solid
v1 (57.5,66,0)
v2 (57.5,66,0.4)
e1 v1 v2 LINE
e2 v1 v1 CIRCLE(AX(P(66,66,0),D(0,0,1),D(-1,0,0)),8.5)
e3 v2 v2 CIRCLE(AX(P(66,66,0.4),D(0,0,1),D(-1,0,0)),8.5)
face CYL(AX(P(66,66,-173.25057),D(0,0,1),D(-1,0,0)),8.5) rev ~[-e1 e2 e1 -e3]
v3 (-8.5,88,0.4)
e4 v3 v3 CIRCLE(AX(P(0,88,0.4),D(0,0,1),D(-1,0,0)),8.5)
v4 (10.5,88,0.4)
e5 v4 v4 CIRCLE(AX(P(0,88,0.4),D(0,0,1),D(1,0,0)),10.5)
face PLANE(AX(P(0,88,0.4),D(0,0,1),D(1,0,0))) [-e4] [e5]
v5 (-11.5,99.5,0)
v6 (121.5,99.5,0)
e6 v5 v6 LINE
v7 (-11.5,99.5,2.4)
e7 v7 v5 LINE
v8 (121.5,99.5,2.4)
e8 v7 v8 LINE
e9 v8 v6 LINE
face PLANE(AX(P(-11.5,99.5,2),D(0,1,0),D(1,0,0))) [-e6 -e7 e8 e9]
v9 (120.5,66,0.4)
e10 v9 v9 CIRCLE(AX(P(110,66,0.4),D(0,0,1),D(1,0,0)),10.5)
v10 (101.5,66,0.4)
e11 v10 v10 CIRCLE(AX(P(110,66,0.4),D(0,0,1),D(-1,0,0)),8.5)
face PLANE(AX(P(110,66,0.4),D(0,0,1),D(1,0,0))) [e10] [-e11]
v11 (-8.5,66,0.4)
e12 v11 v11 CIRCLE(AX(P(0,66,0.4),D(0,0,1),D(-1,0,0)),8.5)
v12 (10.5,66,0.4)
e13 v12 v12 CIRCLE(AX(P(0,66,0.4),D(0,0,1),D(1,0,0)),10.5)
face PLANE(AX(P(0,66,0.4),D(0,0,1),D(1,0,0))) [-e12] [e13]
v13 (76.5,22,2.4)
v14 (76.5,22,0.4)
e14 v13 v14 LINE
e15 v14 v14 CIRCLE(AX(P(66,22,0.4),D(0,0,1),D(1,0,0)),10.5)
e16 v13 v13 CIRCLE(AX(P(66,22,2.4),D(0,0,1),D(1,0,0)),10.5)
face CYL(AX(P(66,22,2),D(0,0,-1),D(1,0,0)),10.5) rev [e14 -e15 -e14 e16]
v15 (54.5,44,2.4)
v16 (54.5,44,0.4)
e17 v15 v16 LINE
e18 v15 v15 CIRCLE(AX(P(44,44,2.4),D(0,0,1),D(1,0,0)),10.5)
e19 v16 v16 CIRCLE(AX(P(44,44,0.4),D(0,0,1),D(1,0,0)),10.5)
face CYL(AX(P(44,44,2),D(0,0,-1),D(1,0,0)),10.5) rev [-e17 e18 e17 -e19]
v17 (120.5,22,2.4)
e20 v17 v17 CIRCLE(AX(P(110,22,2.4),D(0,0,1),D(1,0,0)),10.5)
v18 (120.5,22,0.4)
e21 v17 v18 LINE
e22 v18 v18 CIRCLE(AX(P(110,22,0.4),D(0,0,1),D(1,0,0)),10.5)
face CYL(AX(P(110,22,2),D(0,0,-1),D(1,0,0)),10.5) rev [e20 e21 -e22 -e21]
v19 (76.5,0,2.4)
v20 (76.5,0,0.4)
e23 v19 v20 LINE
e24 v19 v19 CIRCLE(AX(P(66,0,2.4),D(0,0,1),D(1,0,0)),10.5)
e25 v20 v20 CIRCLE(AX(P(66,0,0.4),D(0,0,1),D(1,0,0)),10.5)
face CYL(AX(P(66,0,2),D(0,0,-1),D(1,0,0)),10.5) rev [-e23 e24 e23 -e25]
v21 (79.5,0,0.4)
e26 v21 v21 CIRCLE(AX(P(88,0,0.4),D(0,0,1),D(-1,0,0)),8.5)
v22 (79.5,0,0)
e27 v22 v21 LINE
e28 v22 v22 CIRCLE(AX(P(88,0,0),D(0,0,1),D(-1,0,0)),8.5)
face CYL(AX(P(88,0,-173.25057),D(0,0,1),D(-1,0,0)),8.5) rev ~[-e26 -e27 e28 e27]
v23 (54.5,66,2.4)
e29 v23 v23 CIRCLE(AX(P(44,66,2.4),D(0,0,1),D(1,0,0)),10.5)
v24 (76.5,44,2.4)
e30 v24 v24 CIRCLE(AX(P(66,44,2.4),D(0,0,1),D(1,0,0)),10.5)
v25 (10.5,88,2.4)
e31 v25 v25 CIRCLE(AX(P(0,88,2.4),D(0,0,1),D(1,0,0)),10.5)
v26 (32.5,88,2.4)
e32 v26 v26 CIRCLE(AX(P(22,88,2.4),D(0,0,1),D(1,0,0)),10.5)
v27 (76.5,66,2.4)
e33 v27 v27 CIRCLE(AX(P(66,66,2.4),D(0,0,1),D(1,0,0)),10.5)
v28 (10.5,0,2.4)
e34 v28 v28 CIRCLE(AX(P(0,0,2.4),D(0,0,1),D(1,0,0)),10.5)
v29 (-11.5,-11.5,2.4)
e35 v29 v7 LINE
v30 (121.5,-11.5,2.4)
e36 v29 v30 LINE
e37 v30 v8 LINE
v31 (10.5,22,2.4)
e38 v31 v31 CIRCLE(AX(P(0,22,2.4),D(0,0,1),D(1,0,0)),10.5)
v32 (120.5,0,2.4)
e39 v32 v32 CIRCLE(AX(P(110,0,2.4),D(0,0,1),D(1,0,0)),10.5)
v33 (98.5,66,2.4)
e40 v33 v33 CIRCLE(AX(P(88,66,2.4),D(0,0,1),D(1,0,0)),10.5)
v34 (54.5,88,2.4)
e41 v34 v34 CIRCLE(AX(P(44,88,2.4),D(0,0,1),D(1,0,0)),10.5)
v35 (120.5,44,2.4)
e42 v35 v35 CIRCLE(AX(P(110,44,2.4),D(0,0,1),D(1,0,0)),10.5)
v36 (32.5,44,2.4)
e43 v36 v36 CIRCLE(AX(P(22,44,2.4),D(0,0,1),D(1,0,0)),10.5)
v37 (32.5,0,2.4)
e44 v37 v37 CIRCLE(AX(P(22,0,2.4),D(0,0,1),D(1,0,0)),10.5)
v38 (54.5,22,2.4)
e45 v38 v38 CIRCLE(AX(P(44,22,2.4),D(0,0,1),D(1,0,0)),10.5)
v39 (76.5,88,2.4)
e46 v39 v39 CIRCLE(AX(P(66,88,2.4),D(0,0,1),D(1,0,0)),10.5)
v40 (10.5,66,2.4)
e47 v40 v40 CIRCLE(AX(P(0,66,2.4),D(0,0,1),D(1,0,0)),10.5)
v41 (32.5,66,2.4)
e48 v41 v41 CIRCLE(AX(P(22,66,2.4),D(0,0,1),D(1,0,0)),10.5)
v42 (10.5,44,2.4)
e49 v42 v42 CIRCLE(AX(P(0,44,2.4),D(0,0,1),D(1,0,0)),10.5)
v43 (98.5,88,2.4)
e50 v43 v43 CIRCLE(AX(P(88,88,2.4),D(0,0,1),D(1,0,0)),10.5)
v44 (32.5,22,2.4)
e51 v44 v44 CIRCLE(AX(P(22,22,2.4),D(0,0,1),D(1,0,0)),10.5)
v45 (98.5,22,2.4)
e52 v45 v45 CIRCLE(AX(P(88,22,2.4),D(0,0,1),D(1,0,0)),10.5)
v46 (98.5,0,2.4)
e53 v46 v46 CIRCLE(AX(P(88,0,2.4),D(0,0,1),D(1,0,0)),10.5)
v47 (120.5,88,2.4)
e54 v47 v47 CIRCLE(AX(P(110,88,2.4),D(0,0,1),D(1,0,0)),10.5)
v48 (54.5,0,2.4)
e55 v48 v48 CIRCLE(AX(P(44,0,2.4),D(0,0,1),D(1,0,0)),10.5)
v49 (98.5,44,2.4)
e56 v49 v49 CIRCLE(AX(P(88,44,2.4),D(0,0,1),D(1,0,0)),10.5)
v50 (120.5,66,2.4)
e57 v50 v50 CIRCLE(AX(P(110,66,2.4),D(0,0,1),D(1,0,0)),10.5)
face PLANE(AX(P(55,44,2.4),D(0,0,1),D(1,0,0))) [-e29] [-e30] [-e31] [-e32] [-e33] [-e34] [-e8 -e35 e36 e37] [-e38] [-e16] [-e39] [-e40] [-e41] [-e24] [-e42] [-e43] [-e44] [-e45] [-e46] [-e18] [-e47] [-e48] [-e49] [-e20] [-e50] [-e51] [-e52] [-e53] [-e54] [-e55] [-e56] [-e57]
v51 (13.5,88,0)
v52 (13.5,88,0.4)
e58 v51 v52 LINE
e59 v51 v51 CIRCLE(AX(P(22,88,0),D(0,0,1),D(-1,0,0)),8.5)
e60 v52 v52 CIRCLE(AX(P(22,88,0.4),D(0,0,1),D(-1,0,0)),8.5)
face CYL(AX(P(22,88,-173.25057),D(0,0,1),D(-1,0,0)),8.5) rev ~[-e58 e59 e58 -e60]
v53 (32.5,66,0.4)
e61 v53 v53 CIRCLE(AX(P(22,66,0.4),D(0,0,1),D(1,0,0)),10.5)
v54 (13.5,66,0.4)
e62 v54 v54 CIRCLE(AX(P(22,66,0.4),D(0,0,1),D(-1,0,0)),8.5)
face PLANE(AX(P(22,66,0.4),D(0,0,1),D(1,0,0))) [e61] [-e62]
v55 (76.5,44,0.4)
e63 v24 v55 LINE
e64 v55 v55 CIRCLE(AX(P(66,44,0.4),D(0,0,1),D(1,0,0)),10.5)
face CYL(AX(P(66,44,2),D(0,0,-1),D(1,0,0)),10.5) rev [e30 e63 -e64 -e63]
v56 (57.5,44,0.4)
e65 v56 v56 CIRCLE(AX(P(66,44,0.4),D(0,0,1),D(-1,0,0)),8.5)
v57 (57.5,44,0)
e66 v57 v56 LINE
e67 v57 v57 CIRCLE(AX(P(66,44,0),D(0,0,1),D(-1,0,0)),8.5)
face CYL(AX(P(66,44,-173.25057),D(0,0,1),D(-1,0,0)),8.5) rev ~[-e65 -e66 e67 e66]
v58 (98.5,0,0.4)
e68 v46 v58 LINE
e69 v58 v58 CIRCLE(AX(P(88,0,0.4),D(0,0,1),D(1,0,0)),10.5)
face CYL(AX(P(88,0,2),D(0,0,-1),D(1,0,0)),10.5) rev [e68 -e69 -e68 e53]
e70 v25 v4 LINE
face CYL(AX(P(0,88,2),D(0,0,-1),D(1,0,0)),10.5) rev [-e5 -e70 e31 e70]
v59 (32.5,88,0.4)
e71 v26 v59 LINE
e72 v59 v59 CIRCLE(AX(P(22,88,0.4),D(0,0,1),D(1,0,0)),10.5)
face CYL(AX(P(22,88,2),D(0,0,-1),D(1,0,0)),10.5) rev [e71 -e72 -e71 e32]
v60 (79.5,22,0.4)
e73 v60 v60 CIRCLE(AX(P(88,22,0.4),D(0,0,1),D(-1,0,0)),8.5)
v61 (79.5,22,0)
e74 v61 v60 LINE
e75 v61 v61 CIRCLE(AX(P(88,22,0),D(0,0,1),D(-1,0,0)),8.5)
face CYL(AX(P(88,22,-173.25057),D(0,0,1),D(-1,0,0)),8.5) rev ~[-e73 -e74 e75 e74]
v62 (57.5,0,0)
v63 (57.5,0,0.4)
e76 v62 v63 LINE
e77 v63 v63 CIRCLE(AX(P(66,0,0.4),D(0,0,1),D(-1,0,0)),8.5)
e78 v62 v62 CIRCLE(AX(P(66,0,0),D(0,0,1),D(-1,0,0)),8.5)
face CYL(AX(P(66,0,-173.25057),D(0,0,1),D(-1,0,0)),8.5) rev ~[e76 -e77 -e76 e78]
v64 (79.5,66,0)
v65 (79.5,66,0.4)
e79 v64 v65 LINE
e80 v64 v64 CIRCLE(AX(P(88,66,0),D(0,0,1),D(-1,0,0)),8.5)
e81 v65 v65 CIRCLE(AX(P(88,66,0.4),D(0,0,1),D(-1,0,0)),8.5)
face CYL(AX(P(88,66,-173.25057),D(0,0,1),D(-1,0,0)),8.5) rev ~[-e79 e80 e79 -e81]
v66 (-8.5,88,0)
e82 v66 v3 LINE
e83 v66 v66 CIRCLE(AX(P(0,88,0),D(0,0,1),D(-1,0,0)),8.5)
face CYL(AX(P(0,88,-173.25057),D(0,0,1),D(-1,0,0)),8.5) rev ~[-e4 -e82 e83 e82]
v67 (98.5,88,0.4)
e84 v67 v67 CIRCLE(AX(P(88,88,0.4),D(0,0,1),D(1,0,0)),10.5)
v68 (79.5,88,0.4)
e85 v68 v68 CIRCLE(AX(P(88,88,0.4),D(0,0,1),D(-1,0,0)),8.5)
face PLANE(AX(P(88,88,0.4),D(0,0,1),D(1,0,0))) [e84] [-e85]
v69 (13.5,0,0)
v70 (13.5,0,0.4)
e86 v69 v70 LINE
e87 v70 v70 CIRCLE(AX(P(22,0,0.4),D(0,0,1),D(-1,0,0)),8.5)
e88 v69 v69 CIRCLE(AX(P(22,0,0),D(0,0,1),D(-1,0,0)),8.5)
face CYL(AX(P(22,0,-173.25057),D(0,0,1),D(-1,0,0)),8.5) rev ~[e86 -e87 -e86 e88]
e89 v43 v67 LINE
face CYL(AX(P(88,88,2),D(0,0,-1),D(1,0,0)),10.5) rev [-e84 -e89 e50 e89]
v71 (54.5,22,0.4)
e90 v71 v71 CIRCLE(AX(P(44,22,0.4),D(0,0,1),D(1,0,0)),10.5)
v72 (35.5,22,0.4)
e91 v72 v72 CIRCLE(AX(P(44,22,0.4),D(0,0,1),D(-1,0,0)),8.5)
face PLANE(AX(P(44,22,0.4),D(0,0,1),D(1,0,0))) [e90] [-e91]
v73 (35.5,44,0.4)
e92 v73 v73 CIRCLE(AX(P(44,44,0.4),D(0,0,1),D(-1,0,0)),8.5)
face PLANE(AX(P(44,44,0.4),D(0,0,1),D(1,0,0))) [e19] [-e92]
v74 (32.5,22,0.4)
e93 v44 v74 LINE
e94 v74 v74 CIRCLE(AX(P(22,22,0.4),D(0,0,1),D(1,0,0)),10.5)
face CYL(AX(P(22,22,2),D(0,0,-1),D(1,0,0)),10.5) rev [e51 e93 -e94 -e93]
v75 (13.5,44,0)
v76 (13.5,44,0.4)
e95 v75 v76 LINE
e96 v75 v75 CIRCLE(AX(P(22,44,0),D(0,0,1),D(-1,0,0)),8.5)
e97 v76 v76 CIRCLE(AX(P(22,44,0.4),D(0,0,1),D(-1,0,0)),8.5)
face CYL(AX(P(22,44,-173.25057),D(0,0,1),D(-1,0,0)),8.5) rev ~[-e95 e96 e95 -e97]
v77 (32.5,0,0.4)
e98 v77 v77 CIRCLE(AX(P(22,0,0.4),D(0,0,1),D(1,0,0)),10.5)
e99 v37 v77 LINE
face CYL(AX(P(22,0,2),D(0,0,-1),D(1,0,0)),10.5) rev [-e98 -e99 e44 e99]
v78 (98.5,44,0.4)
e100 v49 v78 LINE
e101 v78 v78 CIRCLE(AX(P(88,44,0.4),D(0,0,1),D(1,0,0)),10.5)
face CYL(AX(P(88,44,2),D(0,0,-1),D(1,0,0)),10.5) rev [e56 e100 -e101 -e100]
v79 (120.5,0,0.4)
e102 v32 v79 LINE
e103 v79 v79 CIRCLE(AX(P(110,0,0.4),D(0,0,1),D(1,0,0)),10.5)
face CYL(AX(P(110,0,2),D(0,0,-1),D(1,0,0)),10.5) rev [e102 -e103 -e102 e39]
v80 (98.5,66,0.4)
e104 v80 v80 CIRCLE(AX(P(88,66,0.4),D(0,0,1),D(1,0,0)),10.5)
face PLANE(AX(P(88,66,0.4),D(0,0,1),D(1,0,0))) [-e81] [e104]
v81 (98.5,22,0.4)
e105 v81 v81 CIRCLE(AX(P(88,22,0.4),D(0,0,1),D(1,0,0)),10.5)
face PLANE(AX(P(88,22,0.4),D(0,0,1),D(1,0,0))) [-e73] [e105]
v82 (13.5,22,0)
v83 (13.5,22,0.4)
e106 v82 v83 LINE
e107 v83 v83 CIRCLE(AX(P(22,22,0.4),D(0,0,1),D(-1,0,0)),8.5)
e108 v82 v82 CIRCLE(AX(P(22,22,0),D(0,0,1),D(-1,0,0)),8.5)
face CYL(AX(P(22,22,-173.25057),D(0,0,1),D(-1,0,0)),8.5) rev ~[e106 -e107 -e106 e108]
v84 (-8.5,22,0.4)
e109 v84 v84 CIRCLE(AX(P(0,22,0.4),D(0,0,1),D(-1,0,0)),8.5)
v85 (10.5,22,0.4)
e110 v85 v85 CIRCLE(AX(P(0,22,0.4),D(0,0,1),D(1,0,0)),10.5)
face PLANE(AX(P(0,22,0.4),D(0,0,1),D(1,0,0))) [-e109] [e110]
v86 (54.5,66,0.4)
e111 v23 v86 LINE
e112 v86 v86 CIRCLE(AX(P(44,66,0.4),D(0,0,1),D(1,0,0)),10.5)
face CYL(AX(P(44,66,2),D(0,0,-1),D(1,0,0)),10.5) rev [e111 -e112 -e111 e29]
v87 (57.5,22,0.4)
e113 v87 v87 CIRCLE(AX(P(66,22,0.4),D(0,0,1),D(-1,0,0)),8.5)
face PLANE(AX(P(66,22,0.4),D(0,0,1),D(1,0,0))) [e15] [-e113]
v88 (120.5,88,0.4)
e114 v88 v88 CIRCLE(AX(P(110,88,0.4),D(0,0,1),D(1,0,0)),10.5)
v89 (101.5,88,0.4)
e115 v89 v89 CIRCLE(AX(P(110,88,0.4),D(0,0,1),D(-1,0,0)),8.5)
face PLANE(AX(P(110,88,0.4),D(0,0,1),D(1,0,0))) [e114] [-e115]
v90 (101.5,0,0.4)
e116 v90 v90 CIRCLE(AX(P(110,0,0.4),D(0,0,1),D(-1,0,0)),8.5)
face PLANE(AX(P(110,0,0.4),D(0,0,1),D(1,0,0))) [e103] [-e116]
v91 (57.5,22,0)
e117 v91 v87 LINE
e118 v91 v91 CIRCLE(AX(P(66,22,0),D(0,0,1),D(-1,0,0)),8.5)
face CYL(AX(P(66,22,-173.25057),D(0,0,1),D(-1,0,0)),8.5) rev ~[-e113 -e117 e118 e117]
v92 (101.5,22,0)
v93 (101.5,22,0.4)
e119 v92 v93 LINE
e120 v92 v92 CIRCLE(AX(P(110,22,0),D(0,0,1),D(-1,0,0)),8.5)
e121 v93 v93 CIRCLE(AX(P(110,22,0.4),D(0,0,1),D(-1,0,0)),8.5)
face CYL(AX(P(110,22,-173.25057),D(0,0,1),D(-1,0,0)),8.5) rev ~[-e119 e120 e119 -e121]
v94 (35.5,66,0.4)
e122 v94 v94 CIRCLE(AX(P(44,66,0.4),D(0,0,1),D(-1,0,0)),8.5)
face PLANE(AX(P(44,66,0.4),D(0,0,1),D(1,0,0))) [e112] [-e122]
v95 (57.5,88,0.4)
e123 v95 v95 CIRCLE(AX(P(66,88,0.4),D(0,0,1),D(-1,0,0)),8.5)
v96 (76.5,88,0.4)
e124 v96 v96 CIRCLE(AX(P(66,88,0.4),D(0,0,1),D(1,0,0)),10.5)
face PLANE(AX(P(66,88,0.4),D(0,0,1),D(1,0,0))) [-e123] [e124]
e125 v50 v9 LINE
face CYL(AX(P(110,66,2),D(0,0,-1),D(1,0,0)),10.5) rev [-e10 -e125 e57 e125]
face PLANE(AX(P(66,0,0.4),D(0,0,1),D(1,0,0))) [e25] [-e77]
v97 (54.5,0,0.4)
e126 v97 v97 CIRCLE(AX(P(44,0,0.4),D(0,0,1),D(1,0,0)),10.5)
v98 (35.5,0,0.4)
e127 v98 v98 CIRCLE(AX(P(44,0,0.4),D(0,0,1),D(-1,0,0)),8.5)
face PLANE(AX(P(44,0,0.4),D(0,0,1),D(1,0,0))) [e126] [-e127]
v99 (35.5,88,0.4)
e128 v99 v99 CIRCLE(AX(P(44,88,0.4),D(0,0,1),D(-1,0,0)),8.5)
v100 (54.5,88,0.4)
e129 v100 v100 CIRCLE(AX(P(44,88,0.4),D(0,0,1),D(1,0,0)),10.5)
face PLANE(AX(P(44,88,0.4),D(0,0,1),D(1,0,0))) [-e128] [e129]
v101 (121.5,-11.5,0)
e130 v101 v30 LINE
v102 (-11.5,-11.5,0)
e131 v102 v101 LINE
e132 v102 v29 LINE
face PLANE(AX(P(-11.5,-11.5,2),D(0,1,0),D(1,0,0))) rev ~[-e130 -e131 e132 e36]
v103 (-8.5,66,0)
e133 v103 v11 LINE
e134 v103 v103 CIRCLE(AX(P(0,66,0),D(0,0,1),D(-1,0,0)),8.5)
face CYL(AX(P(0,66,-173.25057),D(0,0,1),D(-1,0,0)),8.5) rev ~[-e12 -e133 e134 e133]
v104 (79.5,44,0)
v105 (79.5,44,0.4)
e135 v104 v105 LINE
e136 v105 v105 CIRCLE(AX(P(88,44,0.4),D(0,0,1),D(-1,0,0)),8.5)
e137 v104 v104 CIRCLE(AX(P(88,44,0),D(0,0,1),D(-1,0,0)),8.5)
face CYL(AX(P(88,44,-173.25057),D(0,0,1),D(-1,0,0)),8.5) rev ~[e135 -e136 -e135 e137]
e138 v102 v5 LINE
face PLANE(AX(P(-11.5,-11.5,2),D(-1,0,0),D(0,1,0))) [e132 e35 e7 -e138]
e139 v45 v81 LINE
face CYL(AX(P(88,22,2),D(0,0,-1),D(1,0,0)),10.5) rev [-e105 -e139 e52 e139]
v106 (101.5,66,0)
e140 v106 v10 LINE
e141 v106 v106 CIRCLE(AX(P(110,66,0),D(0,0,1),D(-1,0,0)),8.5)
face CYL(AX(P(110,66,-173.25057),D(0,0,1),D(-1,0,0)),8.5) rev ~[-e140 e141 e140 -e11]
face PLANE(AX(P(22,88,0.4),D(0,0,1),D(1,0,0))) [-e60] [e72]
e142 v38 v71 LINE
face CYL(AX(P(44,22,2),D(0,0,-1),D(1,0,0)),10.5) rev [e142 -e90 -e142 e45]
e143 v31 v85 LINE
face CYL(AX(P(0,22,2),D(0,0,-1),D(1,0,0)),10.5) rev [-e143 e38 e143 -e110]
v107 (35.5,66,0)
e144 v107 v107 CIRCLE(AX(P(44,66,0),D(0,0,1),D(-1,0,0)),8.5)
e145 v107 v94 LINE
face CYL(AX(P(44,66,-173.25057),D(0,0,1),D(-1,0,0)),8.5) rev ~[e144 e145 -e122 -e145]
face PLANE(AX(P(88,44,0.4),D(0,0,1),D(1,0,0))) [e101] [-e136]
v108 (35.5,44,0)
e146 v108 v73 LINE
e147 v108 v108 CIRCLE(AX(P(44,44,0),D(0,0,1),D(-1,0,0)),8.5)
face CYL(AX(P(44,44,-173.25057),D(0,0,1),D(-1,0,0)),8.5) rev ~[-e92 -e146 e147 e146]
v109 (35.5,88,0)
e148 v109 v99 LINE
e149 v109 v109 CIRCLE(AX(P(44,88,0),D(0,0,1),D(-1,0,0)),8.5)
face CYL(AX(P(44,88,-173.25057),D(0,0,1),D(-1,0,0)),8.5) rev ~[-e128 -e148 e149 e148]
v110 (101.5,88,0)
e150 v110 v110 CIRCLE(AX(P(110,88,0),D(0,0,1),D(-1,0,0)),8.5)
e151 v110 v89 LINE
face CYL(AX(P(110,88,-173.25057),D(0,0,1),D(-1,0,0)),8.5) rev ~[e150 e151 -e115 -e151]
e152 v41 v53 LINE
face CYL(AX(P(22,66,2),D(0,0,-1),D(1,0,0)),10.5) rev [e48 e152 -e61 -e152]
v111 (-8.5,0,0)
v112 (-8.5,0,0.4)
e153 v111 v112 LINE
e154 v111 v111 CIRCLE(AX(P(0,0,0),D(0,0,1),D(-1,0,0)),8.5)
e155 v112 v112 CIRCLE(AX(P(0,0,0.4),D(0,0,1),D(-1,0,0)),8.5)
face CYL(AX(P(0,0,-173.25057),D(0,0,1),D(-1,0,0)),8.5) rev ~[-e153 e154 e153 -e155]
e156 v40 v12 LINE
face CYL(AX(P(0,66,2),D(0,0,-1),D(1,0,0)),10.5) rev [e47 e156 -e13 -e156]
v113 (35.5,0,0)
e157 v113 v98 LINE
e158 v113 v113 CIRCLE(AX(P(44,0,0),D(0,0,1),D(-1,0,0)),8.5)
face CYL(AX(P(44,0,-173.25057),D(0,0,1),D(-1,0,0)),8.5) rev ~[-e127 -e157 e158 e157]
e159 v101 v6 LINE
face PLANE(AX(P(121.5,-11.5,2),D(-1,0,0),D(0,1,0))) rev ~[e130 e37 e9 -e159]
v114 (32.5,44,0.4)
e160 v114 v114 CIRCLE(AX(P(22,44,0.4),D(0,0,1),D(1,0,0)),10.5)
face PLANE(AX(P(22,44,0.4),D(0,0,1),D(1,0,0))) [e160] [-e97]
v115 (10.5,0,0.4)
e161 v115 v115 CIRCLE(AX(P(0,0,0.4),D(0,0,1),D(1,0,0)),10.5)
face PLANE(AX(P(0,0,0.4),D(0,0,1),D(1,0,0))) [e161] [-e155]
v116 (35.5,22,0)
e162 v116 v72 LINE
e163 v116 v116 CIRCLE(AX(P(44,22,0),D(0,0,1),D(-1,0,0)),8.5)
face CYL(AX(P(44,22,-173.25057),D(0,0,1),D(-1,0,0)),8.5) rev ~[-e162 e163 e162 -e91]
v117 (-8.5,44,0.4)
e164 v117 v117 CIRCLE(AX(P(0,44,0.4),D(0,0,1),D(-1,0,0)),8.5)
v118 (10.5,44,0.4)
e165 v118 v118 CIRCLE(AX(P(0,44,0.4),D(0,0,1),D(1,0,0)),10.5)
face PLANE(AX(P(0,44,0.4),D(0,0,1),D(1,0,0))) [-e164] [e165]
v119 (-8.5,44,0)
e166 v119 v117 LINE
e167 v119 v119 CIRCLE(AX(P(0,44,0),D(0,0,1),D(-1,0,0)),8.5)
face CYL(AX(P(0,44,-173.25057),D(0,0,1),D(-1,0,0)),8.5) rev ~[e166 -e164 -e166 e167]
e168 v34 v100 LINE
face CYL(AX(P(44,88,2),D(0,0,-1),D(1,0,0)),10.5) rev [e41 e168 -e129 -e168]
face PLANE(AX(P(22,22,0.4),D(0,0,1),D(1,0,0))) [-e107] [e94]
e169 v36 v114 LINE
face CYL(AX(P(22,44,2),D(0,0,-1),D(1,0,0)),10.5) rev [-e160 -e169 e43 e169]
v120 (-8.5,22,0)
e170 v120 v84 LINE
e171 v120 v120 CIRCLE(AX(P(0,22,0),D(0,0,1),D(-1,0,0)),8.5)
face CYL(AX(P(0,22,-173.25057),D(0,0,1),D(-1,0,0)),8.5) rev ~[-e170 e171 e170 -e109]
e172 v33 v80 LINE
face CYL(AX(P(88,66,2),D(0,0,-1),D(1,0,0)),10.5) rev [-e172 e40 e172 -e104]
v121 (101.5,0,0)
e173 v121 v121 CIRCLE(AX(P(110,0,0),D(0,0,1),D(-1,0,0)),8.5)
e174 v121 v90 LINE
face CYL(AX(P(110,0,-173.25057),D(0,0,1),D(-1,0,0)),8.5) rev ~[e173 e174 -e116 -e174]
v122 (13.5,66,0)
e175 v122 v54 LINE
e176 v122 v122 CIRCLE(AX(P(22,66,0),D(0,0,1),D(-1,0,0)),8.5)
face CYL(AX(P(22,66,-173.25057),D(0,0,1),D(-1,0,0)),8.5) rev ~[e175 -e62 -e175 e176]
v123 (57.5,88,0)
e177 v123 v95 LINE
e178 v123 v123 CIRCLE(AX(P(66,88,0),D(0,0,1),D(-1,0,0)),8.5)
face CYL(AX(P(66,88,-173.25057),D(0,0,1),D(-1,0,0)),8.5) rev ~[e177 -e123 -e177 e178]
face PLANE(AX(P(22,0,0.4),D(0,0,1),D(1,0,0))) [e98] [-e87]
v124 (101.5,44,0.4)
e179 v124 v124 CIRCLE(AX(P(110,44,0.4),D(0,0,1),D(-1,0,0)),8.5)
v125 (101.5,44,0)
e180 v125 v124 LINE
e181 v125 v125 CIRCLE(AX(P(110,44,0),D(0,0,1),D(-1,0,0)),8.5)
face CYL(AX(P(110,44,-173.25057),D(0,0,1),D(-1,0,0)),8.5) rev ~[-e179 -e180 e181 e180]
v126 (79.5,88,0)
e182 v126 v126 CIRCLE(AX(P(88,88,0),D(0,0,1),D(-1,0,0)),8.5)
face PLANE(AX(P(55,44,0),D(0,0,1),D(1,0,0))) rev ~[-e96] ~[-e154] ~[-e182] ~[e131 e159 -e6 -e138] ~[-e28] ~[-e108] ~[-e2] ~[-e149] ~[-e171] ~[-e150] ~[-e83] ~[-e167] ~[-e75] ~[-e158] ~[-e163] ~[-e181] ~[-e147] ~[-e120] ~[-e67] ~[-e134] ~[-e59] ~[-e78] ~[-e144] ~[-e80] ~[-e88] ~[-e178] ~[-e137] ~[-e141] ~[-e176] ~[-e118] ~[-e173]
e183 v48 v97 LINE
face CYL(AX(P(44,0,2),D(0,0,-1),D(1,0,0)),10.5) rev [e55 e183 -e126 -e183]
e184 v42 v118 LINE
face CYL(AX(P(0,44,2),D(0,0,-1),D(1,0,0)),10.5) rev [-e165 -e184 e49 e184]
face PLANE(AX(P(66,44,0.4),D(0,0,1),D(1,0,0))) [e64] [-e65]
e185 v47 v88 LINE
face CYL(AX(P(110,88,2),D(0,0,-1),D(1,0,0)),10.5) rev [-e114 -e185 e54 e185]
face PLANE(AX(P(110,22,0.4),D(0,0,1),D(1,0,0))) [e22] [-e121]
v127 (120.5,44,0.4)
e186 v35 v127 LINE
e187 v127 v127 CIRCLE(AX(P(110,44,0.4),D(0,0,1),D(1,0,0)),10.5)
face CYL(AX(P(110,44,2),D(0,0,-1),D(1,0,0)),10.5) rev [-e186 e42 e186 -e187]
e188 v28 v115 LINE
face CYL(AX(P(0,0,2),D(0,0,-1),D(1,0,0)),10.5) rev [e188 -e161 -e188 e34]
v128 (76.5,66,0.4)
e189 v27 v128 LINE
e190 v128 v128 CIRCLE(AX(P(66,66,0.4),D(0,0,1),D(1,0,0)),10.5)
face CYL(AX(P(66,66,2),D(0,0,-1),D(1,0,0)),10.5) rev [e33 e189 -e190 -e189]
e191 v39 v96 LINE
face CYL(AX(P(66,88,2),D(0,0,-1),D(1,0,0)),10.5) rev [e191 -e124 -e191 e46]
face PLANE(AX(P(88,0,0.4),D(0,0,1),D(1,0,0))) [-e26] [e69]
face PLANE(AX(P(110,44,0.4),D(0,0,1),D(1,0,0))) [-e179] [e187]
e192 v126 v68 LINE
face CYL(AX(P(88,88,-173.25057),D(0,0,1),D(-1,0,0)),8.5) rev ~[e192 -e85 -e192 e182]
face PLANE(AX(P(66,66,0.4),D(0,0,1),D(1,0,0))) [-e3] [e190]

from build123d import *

# Parameters (mm, degrees)
F1_W      = 133
F1_H      = 111
F1_R      = 10.5
F2_DEPTH  = 2
F2_FACE_W = 133
F2_FACE_H = 111
F2_FACE_R = 10.5
F3_DEPTH  = 0.4
F4_D      = 17


# Not quite as in the source:
# - a feature of the source that left no trace in its solid (it failed there, or was rolled back) is left out


with BuildPart() as f2:
    # F1 (on Top) → F2 (new body)
    with BuildSketch(Plane.XY):
        with Locations((55, 44)):
            Rectangle(F1_W, F1_H)
        Circle(F1_R, mode=Mode.SUBTRACT)
        with Locations((22, 0)):
            Circle(F1_R, mode=Mode.SUBTRACT)
        with Locations((44, 0)):
            Circle(F1_R, mode=Mode.SUBTRACT)
        with Locations((0, 22)):
            Circle(F1_R, mode=Mode.SUBTRACT)
        with Locations((22, 22)):
            Circle(F1_R, mode=Mode.SUBTRACT)
        with Locations((44, 22)):
            Circle(F1_R, mode=Mode.SUBTRACT)
        with Locations((66, 0)):
            Circle(F1_R, mode=Mode.SUBTRACT)
        with Locations((88, 0)):
            Circle(F1_R, mode=Mode.SUBTRACT)
        with Locations((110, 0)):
            Circle(F1_R, mode=Mode.SUBTRACT)
        with Locations((66, 22)):
            Circle(F1_R, mode=Mode.SUBTRACT)
        with Locations((88, 22)):
            Circle(F1_R, mode=Mode.SUBTRACT)
        with Locations((110, 22)):
            Circle(F1_R, mode=Mode.SUBTRACT)
        with Locations((0, 44)):
            Circle(F1_R, mode=Mode.SUBTRACT)
        with Locations((0, 66)):
            Circle(F1_R, mode=Mode.SUBTRACT)
        with Locations((22, 44)):
            Circle(F1_R, mode=Mode.SUBTRACT)
        with Locations((44, 44)):
            Circle(F1_R, mode=Mode.SUBTRACT)
        with Locations((22, 66)):
            Circle(F1_R, mode=Mode.SUBTRACT)
        with Locations((44, 66)):
            Circle(F1_R, mode=Mode.SUBTRACT)
        with Locations((0, 88)):
            Circle(F1_R, mode=Mode.SUBTRACT)
        with Locations((22, 88)):
            Circle(F1_R, mode=Mode.SUBTRACT)
        with Locations((44, 88)):
            Circle(F1_R, mode=Mode.SUBTRACT)
        with Locations((66, 44)):
            Circle(F1_R, mode=Mode.SUBTRACT)
        with Locations((88, 44)):
            Circle(F1_R, mode=Mode.SUBTRACT)
        with Locations((66, 66)):
            Circle(F1_R, mode=Mode.SUBTRACT)
        with Locations((88, 66)):
            Circle(F1_R, mode=Mode.SUBTRACT)
        with Locations((110, 44)):
            Circle(F1_R, mode=Mode.SUBTRACT)
        with Locations((110, 66)):
            Circle(F1_R, mode=Mode.SUBTRACT)
        with Locations((66, 88)):
            Circle(F1_R, mode=Mode.SUBTRACT)
        with Locations((88, 88)):
            Circle(F1_R, mode=Mode.SUBTRACT)
        with Locations((110, 88)):
            Circle(F1_R, mode=Mode.SUBTRACT)
    extrude(amount=F2_DEPTH)

    # F2_face (on face) + F1 (on Top) → F3 (join)
    with BuildSketch(Plane(origin=(55, 44, 2), x_dir=(1, 0, 0), z_dir=(0, 0, 1))):
        Rectangle(F2_FACE_W, F2_FACE_H)
        with Locations((-55, -44)):
            Circle(F2_FACE_R, mode=Mode.SUBTRACT)
        with Locations((-33, -44)):
            Circle(F2_FACE_R, mode=Mode.SUBTRACT)
        with Locations((-11, -44)):
            Circle(F2_FACE_R, mode=Mode.SUBTRACT)
        with Locations((-55, -22)):
            Circle(F2_FACE_R, mode=Mode.SUBTRACT)
        with Locations((-33, -22)):
            Circle(F2_FACE_R, mode=Mode.SUBTRACT)
        with Locations((-11, -22)):
            Circle(F2_FACE_R, mode=Mode.SUBTRACT)
        with Locations((11, -44)):
            Circle(F2_FACE_R, mode=Mode.SUBTRACT)
        with Locations((33, -44)):
            Circle(F2_FACE_R, mode=Mode.SUBTRACT)
        with Locations((55, -44)):
            Circle(F2_FACE_R, mode=Mode.SUBTRACT)
        with Locations((11, -22)):
            Circle(F2_FACE_R, mode=Mode.SUBTRACT)
        with Locations((33, -22)):
            Circle(F2_FACE_R, mode=Mode.SUBTRACT)
        with Locations((55, -22)):
            Circle(F2_FACE_R, mode=Mode.SUBTRACT)
        with Locations((-55, 0)):
            Circle(F2_FACE_R, mode=Mode.SUBTRACT)
        with Locations((-55, 22)):
            Circle(F2_FACE_R, mode=Mode.SUBTRACT)
        with Locations((-33, 0)):
            Circle(F2_FACE_R, mode=Mode.SUBTRACT)
        with Locations((-11, 0)):
            Circle(F2_FACE_R, mode=Mode.SUBTRACT)
        with Locations((-33, 22)):
            Circle(F2_FACE_R, mode=Mode.SUBTRACT)
        with Locations((-11, 22)):
            Circle(F2_FACE_R, mode=Mode.SUBTRACT)
        with Locations((-55, 44)):
            Circle(F2_FACE_R, mode=Mode.SUBTRACT)
        with Locations((-33, 44)):
            Circle(F2_FACE_R, mode=Mode.SUBTRACT)
        with Locations((-11, 44)):
            Circle(F2_FACE_R, mode=Mode.SUBTRACT)
        with Locations((11, 0)):
            Circle(F2_FACE_R, mode=Mode.SUBTRACT)
        with Locations((33, 0)):
            Circle(F2_FACE_R, mode=Mode.SUBTRACT)
        with Locations((11, 22)):
            Circle(F2_FACE_R, mode=Mode.SUBTRACT)
        with Locations((33, 22)):
            Circle(F2_FACE_R, mode=Mode.SUBTRACT)
        with Locations((55, 0)):
            Circle(F2_FACE_R, mode=Mode.SUBTRACT)
        with Locations((55, 22)):
            Circle(F2_FACE_R, mode=Mode.SUBTRACT)
        with Locations((11, 44)):
            Circle(F2_FACE_R, mode=Mode.SUBTRACT)
        with Locations((33, 44)):
            Circle(F2_FACE_R, mode=Mode.SUBTRACT)
        with Locations((55, 44)):
            Circle(F2_FACE_R, mode=Mode.SUBTRACT)
    with BuildSketch(Plane.XY):
        with Locations((0, 88)):
            Circle(F1_R)
        with Locations((22, 88)):
            Circle(F1_R)
        with Locations((44, 88)):
            Circle(F1_R)
        with Locations((66, 88)):
            Circle(F1_R)
        with Locations((88, 88)):
            Circle(F1_R)
        with Locations((110, 88)):
            Circle(F1_R)
        with Locations((110, 66)):
            Circle(F1_R)
        with Locations((88, 66)):
            Circle(F1_R)
        with Locations((66, 66)):
            Circle(F1_R)
        with Locations((44, 66)):
            Circle(F1_R)
        with Locations((22, 66)):
            Circle(F1_R)
        with Locations((0, 66)):
            Circle(F1_R)
        with Locations((22, 44)):
            Circle(F1_R)
        with Locations((0, 44)):
            Circle(F1_R)
        with Locations((44, 44)):
            Circle(F1_R)
        with Locations((66, 44)):
            Circle(F1_R)
        with Locations((88, 44)):
            Circle(F1_R)
        with Locations((110, 44)):
            Circle(F1_R)
        with Locations((110, 22)):
            Circle(F1_R)
        with Locations((88, 22)):
            Circle(F1_R)
        with Locations((66, 22)):
            Circle(F1_R)
        with Locations((44, 22)):
            Circle(F1_R)
        with Locations((22, 22)):
            Circle(F1_R)
        with Locations((0, 22)):
            Circle(F1_R)
        Circle(F1_R)
        with Locations((22, 0)):
            Circle(F1_R)
        with Locations((44, 0)):
            Circle(F1_R)
        with Locations((66, 0)):
            Circle(F1_R)
        with Locations((88, 0)):
            Circle(F1_R)
        with Locations((110, 0)):
            Circle(F1_R)
    extrude(amount=F3_DEPTH)

    # F4 (through all)
    with Locations(Plane(origin=(0, 0, 0), x_dir=(1, 0, 0), z_dir=(0, 0, -1))):
        with Locations((0, -88), (22, -88), (44, -88), (66, -88), (88, -88), (110, -88), (110, -66), (88, -66), (66, -66), (44, -66), (22, -66), (0, -66), (0, -44), (22, -44), (44, -44), (66, -44), (88, -44), (110, -44), (110, -22), (88, -22), (66, -22), (44, -22), (22, -22), (0, -22), (110, 0), (88, 0), (66, 0), (44, 0), (22, 0), (0, 0)):
            Hole(F4_D / 2)


solid = f2.part
